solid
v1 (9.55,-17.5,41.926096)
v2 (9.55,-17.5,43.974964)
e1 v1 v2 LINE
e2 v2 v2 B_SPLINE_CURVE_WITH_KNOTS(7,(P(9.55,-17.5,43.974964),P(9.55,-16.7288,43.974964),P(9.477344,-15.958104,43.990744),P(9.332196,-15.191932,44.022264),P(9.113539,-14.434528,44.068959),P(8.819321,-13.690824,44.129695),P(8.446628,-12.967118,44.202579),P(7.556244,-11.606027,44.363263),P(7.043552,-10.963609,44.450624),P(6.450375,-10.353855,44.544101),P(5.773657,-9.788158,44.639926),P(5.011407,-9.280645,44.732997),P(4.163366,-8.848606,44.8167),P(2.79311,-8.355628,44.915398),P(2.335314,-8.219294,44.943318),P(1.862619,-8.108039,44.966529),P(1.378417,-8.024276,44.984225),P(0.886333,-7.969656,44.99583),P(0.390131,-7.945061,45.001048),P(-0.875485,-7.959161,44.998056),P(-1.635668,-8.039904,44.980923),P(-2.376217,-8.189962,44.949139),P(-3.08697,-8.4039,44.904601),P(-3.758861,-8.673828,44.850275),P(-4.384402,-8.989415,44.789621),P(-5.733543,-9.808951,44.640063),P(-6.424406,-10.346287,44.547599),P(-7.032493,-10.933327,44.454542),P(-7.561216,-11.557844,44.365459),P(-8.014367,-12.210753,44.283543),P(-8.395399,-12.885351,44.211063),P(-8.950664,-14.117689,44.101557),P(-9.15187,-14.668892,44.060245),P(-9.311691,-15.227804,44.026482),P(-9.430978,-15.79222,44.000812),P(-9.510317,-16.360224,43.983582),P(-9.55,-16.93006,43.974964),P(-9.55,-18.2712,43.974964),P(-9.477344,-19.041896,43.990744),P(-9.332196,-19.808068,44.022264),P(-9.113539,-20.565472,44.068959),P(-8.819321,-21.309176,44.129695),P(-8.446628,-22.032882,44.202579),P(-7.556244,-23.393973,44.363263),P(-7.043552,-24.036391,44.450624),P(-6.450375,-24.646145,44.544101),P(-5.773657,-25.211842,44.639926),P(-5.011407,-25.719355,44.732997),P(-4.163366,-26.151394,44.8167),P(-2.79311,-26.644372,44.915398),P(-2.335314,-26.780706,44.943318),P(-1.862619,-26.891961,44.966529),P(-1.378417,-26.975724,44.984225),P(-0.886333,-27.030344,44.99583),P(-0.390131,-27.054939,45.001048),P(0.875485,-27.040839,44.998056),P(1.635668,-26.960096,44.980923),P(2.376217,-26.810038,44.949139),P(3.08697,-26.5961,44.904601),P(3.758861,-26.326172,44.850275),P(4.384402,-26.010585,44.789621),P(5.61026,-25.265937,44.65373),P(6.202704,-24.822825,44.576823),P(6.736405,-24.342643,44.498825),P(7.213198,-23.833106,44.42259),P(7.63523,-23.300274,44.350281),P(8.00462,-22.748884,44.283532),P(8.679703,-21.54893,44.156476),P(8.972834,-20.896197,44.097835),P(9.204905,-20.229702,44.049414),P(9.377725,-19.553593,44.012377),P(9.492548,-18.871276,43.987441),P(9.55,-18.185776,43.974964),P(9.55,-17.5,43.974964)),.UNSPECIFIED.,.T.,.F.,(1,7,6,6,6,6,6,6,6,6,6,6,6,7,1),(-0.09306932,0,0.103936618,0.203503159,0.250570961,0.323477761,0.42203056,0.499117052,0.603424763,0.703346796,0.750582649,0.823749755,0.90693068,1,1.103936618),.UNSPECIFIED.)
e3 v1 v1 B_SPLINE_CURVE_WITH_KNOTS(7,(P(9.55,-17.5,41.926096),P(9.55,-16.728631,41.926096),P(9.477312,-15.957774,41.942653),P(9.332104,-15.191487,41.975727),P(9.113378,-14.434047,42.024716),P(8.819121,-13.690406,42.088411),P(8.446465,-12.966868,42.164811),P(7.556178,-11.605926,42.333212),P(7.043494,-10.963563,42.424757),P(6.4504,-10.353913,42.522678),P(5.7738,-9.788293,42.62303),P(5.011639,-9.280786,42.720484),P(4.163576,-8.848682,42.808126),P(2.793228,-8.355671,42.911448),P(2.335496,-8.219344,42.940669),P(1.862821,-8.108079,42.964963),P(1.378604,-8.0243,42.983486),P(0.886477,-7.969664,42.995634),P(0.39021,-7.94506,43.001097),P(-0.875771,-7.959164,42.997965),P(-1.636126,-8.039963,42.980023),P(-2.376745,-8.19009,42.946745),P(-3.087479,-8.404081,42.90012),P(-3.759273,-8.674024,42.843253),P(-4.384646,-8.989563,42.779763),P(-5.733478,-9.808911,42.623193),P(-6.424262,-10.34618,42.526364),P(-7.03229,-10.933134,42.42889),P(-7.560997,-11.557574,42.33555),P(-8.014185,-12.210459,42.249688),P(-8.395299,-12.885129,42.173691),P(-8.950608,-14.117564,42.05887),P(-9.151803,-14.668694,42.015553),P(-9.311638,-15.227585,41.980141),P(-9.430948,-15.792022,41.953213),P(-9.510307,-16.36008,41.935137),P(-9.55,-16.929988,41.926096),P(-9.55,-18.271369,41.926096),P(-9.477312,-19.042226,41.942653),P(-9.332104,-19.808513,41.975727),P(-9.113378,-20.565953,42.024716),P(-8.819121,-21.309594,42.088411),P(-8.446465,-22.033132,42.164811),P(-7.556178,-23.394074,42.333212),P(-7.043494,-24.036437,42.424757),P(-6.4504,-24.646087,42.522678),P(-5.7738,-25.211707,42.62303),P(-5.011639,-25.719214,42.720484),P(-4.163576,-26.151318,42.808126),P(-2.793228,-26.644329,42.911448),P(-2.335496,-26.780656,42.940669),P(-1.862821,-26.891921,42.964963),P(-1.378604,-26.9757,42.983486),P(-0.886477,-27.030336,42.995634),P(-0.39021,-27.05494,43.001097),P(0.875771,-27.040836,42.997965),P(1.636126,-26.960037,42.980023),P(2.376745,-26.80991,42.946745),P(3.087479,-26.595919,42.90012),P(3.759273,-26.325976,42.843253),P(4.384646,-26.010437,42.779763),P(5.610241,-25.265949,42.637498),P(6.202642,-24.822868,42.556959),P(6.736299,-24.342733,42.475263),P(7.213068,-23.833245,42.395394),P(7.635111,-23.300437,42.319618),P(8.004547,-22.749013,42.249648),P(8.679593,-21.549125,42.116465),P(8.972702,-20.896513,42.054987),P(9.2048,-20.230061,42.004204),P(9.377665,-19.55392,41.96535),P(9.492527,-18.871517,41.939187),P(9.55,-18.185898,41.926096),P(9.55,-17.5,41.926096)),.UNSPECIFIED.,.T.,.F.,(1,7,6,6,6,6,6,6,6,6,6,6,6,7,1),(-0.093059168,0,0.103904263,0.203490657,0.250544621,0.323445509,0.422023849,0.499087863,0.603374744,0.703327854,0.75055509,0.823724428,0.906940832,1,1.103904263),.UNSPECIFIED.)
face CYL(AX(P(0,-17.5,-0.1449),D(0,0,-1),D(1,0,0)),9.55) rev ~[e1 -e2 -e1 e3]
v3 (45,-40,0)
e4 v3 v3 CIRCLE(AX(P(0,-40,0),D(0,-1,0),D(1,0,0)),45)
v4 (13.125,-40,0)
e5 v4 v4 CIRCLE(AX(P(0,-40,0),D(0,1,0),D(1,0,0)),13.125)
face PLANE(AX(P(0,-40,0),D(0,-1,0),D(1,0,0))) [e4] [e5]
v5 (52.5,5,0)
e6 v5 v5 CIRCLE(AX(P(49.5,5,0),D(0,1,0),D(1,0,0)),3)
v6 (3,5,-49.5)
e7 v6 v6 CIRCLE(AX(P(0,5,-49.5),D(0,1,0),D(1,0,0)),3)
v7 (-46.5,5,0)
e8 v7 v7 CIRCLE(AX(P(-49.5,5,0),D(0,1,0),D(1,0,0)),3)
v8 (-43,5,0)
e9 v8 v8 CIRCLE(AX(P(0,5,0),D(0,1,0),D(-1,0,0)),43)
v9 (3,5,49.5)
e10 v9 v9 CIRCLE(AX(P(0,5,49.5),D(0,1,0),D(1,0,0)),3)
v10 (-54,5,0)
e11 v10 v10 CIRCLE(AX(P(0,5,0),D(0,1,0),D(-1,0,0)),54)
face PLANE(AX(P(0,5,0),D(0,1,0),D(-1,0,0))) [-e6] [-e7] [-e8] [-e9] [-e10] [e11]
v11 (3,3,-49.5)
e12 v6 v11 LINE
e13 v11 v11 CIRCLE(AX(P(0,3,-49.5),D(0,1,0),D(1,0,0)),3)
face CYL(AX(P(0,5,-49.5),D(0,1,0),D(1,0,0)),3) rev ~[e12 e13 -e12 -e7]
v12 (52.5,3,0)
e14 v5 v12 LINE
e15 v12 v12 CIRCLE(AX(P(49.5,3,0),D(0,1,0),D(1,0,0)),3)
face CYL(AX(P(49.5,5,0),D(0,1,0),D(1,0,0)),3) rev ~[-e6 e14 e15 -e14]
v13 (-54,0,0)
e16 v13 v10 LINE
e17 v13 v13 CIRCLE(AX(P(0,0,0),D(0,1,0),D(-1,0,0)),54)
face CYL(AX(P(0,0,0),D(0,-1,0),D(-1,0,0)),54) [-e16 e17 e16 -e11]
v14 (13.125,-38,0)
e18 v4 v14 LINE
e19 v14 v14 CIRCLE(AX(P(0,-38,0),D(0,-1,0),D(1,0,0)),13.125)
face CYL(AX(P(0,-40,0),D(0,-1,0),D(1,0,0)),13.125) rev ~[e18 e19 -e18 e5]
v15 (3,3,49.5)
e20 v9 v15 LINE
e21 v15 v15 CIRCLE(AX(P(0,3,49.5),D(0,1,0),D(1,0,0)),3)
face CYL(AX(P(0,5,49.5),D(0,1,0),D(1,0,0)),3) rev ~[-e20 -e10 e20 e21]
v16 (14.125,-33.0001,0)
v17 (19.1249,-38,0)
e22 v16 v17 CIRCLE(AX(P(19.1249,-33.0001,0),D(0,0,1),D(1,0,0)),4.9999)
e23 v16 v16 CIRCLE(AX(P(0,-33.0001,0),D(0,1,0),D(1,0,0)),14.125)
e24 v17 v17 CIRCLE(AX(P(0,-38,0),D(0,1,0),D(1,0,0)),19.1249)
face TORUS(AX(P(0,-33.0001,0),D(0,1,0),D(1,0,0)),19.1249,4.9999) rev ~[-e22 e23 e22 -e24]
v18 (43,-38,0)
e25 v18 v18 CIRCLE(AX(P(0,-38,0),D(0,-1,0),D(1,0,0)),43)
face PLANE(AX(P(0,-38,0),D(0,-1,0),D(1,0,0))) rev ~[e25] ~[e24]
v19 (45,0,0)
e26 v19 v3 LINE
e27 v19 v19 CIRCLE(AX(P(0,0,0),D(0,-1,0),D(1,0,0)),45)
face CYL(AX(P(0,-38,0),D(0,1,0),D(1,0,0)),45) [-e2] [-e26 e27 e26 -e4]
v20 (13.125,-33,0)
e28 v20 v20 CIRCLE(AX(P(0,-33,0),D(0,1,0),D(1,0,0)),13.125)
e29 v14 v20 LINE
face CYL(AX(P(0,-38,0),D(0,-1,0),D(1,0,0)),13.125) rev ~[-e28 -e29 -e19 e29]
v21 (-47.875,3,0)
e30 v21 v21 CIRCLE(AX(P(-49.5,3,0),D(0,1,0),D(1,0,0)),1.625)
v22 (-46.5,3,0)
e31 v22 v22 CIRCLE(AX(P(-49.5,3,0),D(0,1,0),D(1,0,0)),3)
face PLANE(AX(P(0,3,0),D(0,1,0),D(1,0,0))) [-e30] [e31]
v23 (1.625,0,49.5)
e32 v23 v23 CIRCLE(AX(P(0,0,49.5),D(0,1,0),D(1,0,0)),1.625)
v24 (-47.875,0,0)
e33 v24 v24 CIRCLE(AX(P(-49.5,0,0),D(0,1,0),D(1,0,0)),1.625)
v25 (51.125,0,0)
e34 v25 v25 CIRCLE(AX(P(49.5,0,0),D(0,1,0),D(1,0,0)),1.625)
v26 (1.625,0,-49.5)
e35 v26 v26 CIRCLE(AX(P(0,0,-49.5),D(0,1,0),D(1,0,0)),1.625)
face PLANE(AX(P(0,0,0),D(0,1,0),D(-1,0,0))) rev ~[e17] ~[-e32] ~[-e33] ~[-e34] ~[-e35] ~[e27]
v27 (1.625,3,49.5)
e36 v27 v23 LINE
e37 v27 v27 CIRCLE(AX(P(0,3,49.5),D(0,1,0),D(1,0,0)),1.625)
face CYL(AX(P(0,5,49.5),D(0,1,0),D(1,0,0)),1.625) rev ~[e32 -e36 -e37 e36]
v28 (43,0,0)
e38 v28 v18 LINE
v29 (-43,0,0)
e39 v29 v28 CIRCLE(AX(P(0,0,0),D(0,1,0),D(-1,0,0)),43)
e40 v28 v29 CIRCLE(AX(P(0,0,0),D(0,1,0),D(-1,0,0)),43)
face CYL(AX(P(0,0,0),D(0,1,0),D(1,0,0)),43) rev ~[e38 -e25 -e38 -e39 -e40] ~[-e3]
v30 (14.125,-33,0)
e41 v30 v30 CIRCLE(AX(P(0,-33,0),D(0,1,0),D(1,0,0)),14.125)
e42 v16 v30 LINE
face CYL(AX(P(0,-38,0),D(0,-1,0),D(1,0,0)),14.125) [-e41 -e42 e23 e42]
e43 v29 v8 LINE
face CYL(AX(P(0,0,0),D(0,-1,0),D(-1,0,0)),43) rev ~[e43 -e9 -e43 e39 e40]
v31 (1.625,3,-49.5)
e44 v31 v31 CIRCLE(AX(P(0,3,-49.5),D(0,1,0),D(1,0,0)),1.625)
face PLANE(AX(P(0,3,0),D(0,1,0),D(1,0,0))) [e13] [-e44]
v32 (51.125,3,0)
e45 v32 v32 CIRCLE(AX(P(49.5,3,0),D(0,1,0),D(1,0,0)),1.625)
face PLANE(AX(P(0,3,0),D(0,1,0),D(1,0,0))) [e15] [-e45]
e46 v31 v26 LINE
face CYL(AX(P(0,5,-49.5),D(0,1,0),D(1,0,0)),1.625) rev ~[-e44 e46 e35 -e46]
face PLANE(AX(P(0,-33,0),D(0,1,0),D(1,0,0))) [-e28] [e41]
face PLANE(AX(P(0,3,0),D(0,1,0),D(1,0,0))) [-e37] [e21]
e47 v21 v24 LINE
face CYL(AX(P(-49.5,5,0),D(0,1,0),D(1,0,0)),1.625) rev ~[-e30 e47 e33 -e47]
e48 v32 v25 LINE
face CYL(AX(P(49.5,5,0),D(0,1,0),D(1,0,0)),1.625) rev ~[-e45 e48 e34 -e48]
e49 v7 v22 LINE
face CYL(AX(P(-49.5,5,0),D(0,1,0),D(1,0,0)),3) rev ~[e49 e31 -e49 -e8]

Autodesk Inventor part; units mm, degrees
ref_plane "YZ Plane" through (0, 0, 0) normal (1, 0, 0) x (0, 1, 0)
ref_plane "XZ Plane" through (0, 0, 0) normal (0, 1, 0) x (-1, 0, 0)
ref_plane "XY Plane" through (0, 0, 0) normal (0, 0, 1) x (1, 0, 0)
sketch "Boceto1" plane through (0, 0, 0) normal (0, 1, 0) x (-1, 0, 0)
  circle A0 centre (0, 0) radius 45
  circle A1 centre (0, 0) radius 54
  circle A2 centre (0, 0) radius 43
  dimension "d0" = 90
  dimension "d1" = 9
  dimension "d8" = 2
extrude "Extrusión1" add sketch "Boceto1" along normal blind 5 contours A0 | A1
sketch "Boceto2" plane through (0, 0, 0) normal (0, -1, 0) x (1, 0, 0)
  circle A0 centre (0, 0) radius 45
  circle A1 centre (0, 0) radius 43
  dimension "d7" = 2
extrude "Extrusión2" add sketch "Boceto2" along normal blind 38
sketch "Boceto3" plane through (0, -38, 0) normal (0, -1, 0) x (1, 0, 0)
  circle A0 centre (0, 0) radius 45
extrude "Extrusión3" add sketch "Boceto3" along normal blind 2
sketch "Boceto4" plane through (0, 5, 0) normal (0, 1, 0) x (1, 0, 0)
  circle A0 centre (0, 0) radius 45 construction
  circle A1 centre (0, 0) radius 49.5 construction
  circle A2 centre (-49.5, 0) radius 1.625
  circle A3 centre (0, 49.5) radius 1.625
  circle A4 centre (49.5, 0) radius 1.625
  circle A5 centre (0, -49.5) radius 1.625
  dimension "d11" = 4.5
  dimension "d12" = 90
  dimension "d13" = 3.25
  dimension "d14" = 3.25
  dimension "d15" = 3.25
  dimension "d16" = 3.25
extrude "Extrusión4" cut sketch "Boceto4" against normal blind 10
sketch "Boceto5" plane through (0, 5, 0) normal (0, 1, 0) x (1, 0, 0)
  circle A0 centre (0, 49.5) radius 1.625 projected
  circle A1 centre (0, 49.5) radius 3
  circle A2 centre (49.5, 0) radius 1.625 projected
  circle A3 centre (49.5, 0) radius 3
  circle A4 centre (0, -49.5) radius 1.625 projected
  circle A5 centre (0, -49.5) radius 3
  circle A6 centre (-49.5, 0) radius 1.625 projected
  circle A7 centre (-49.5, 0) radius 3
  point P0 (0, 0)
  dimension "d19" = 6
  dimension "d20" = 6
  dimension "d21" = 6
  dimension "d22" = 6
extrude "Extrusión5" cut sketch "Boceto5" against normal blind 2 contours A0 | A1 | A2 | A3 | A4 | A5 | A6 | A7
sketch "Boceto6" plane through (0, -40, 0) normal (0, -1, 0) x (1, 0, 0)
  circle A0 centre (0, 0) radius 13.125
  dimension "d33" = 26.25
extrude "Extrusión6" cut sketch "Boceto6" against normal blind 5
sketch "Boceto7" plane through (0, -38, 0) normal (0, 1, 0) x (1, 0, 0)
  circle A0 centre (0, 0) radius 13.125
  circle A1 centre (0, 0) radius 14.125
  dimension "d36" = 1
  dimension "d37" = 26.25
extrude "Extrusión7" add sketch "Boceto7" along normal blind 5
fillet "Empalme de cara1" radius 5 1 edges at (-14.125, -38, 0)
sketch "Boceto8" plane through (0, -40, 0) normal (0, -1, 0) x (1, 0, 0)
  line L0 (-102.7174, -0.1449) -> (97.2826, -0.1449)
  line L1 (97.2826, -0.1449) -> (97.2826, -10.1449)
  line L2 (97.2826, -10.1449) -> (-102.7174, -10.1449)
  line L3 (-102.7174, -10.1449) -> (-102.7174, -0.1449)
  point P0 (0, 0)
  dimension "d43" = 200
  dimension "d44" = 10
extrude "Extrusión8" add sketch "Boceto8" along normal blind 10
sketch "Boceto10" plane through (-102.7174, -40, -0.1449) normal (0, 0, 1) x (1, 0, 0)
  line L0 (57.7176, 0) -> (0, 0) projected
  line L1 (0, 0) -> (212.0347, 0)
  line L2 (156.7174, 45) -> (48.7174, 45) projected
  line L3 (48.7174, 45) -> (156.7174, 45)
  line L4 (102.7174, 45) -> (102.7174, 0) construction
  circle A0 centre (102.7174, 22.5) radius 9.55
  point P0 (102.7174, 40)
  dimension "d45" = 19.1
extrude "Extrusión9" cut sketch "Boceto10" along normal blind 70
sketch "Boceto11" plane through (0, -50, 0) normal (0, -1, 0) x (1, 0, 0)
  line L0 (-102.7174, -0.1449) -> (-102.7174, -10.1449) projected
  line L1 (-102.7174, -10.1449) -> (97.2826, -10.1449) projected
  line L2 (-102.7174, -0.1449) -> (97.2826, -0.1449)
  line L3 (97.2826, -0.1449) -> (97.2826, -10.1449)
  line L4 (97.2826, -10.1449) -> (-102.7174, -10.1449)
  line L5 (-102.7174, -10.1449) -> (-102.7174, -0.1449)
  point P0 (0, 0)
extrude "Extrusión10" cut sketch "Boceto11" against normal blind 10
